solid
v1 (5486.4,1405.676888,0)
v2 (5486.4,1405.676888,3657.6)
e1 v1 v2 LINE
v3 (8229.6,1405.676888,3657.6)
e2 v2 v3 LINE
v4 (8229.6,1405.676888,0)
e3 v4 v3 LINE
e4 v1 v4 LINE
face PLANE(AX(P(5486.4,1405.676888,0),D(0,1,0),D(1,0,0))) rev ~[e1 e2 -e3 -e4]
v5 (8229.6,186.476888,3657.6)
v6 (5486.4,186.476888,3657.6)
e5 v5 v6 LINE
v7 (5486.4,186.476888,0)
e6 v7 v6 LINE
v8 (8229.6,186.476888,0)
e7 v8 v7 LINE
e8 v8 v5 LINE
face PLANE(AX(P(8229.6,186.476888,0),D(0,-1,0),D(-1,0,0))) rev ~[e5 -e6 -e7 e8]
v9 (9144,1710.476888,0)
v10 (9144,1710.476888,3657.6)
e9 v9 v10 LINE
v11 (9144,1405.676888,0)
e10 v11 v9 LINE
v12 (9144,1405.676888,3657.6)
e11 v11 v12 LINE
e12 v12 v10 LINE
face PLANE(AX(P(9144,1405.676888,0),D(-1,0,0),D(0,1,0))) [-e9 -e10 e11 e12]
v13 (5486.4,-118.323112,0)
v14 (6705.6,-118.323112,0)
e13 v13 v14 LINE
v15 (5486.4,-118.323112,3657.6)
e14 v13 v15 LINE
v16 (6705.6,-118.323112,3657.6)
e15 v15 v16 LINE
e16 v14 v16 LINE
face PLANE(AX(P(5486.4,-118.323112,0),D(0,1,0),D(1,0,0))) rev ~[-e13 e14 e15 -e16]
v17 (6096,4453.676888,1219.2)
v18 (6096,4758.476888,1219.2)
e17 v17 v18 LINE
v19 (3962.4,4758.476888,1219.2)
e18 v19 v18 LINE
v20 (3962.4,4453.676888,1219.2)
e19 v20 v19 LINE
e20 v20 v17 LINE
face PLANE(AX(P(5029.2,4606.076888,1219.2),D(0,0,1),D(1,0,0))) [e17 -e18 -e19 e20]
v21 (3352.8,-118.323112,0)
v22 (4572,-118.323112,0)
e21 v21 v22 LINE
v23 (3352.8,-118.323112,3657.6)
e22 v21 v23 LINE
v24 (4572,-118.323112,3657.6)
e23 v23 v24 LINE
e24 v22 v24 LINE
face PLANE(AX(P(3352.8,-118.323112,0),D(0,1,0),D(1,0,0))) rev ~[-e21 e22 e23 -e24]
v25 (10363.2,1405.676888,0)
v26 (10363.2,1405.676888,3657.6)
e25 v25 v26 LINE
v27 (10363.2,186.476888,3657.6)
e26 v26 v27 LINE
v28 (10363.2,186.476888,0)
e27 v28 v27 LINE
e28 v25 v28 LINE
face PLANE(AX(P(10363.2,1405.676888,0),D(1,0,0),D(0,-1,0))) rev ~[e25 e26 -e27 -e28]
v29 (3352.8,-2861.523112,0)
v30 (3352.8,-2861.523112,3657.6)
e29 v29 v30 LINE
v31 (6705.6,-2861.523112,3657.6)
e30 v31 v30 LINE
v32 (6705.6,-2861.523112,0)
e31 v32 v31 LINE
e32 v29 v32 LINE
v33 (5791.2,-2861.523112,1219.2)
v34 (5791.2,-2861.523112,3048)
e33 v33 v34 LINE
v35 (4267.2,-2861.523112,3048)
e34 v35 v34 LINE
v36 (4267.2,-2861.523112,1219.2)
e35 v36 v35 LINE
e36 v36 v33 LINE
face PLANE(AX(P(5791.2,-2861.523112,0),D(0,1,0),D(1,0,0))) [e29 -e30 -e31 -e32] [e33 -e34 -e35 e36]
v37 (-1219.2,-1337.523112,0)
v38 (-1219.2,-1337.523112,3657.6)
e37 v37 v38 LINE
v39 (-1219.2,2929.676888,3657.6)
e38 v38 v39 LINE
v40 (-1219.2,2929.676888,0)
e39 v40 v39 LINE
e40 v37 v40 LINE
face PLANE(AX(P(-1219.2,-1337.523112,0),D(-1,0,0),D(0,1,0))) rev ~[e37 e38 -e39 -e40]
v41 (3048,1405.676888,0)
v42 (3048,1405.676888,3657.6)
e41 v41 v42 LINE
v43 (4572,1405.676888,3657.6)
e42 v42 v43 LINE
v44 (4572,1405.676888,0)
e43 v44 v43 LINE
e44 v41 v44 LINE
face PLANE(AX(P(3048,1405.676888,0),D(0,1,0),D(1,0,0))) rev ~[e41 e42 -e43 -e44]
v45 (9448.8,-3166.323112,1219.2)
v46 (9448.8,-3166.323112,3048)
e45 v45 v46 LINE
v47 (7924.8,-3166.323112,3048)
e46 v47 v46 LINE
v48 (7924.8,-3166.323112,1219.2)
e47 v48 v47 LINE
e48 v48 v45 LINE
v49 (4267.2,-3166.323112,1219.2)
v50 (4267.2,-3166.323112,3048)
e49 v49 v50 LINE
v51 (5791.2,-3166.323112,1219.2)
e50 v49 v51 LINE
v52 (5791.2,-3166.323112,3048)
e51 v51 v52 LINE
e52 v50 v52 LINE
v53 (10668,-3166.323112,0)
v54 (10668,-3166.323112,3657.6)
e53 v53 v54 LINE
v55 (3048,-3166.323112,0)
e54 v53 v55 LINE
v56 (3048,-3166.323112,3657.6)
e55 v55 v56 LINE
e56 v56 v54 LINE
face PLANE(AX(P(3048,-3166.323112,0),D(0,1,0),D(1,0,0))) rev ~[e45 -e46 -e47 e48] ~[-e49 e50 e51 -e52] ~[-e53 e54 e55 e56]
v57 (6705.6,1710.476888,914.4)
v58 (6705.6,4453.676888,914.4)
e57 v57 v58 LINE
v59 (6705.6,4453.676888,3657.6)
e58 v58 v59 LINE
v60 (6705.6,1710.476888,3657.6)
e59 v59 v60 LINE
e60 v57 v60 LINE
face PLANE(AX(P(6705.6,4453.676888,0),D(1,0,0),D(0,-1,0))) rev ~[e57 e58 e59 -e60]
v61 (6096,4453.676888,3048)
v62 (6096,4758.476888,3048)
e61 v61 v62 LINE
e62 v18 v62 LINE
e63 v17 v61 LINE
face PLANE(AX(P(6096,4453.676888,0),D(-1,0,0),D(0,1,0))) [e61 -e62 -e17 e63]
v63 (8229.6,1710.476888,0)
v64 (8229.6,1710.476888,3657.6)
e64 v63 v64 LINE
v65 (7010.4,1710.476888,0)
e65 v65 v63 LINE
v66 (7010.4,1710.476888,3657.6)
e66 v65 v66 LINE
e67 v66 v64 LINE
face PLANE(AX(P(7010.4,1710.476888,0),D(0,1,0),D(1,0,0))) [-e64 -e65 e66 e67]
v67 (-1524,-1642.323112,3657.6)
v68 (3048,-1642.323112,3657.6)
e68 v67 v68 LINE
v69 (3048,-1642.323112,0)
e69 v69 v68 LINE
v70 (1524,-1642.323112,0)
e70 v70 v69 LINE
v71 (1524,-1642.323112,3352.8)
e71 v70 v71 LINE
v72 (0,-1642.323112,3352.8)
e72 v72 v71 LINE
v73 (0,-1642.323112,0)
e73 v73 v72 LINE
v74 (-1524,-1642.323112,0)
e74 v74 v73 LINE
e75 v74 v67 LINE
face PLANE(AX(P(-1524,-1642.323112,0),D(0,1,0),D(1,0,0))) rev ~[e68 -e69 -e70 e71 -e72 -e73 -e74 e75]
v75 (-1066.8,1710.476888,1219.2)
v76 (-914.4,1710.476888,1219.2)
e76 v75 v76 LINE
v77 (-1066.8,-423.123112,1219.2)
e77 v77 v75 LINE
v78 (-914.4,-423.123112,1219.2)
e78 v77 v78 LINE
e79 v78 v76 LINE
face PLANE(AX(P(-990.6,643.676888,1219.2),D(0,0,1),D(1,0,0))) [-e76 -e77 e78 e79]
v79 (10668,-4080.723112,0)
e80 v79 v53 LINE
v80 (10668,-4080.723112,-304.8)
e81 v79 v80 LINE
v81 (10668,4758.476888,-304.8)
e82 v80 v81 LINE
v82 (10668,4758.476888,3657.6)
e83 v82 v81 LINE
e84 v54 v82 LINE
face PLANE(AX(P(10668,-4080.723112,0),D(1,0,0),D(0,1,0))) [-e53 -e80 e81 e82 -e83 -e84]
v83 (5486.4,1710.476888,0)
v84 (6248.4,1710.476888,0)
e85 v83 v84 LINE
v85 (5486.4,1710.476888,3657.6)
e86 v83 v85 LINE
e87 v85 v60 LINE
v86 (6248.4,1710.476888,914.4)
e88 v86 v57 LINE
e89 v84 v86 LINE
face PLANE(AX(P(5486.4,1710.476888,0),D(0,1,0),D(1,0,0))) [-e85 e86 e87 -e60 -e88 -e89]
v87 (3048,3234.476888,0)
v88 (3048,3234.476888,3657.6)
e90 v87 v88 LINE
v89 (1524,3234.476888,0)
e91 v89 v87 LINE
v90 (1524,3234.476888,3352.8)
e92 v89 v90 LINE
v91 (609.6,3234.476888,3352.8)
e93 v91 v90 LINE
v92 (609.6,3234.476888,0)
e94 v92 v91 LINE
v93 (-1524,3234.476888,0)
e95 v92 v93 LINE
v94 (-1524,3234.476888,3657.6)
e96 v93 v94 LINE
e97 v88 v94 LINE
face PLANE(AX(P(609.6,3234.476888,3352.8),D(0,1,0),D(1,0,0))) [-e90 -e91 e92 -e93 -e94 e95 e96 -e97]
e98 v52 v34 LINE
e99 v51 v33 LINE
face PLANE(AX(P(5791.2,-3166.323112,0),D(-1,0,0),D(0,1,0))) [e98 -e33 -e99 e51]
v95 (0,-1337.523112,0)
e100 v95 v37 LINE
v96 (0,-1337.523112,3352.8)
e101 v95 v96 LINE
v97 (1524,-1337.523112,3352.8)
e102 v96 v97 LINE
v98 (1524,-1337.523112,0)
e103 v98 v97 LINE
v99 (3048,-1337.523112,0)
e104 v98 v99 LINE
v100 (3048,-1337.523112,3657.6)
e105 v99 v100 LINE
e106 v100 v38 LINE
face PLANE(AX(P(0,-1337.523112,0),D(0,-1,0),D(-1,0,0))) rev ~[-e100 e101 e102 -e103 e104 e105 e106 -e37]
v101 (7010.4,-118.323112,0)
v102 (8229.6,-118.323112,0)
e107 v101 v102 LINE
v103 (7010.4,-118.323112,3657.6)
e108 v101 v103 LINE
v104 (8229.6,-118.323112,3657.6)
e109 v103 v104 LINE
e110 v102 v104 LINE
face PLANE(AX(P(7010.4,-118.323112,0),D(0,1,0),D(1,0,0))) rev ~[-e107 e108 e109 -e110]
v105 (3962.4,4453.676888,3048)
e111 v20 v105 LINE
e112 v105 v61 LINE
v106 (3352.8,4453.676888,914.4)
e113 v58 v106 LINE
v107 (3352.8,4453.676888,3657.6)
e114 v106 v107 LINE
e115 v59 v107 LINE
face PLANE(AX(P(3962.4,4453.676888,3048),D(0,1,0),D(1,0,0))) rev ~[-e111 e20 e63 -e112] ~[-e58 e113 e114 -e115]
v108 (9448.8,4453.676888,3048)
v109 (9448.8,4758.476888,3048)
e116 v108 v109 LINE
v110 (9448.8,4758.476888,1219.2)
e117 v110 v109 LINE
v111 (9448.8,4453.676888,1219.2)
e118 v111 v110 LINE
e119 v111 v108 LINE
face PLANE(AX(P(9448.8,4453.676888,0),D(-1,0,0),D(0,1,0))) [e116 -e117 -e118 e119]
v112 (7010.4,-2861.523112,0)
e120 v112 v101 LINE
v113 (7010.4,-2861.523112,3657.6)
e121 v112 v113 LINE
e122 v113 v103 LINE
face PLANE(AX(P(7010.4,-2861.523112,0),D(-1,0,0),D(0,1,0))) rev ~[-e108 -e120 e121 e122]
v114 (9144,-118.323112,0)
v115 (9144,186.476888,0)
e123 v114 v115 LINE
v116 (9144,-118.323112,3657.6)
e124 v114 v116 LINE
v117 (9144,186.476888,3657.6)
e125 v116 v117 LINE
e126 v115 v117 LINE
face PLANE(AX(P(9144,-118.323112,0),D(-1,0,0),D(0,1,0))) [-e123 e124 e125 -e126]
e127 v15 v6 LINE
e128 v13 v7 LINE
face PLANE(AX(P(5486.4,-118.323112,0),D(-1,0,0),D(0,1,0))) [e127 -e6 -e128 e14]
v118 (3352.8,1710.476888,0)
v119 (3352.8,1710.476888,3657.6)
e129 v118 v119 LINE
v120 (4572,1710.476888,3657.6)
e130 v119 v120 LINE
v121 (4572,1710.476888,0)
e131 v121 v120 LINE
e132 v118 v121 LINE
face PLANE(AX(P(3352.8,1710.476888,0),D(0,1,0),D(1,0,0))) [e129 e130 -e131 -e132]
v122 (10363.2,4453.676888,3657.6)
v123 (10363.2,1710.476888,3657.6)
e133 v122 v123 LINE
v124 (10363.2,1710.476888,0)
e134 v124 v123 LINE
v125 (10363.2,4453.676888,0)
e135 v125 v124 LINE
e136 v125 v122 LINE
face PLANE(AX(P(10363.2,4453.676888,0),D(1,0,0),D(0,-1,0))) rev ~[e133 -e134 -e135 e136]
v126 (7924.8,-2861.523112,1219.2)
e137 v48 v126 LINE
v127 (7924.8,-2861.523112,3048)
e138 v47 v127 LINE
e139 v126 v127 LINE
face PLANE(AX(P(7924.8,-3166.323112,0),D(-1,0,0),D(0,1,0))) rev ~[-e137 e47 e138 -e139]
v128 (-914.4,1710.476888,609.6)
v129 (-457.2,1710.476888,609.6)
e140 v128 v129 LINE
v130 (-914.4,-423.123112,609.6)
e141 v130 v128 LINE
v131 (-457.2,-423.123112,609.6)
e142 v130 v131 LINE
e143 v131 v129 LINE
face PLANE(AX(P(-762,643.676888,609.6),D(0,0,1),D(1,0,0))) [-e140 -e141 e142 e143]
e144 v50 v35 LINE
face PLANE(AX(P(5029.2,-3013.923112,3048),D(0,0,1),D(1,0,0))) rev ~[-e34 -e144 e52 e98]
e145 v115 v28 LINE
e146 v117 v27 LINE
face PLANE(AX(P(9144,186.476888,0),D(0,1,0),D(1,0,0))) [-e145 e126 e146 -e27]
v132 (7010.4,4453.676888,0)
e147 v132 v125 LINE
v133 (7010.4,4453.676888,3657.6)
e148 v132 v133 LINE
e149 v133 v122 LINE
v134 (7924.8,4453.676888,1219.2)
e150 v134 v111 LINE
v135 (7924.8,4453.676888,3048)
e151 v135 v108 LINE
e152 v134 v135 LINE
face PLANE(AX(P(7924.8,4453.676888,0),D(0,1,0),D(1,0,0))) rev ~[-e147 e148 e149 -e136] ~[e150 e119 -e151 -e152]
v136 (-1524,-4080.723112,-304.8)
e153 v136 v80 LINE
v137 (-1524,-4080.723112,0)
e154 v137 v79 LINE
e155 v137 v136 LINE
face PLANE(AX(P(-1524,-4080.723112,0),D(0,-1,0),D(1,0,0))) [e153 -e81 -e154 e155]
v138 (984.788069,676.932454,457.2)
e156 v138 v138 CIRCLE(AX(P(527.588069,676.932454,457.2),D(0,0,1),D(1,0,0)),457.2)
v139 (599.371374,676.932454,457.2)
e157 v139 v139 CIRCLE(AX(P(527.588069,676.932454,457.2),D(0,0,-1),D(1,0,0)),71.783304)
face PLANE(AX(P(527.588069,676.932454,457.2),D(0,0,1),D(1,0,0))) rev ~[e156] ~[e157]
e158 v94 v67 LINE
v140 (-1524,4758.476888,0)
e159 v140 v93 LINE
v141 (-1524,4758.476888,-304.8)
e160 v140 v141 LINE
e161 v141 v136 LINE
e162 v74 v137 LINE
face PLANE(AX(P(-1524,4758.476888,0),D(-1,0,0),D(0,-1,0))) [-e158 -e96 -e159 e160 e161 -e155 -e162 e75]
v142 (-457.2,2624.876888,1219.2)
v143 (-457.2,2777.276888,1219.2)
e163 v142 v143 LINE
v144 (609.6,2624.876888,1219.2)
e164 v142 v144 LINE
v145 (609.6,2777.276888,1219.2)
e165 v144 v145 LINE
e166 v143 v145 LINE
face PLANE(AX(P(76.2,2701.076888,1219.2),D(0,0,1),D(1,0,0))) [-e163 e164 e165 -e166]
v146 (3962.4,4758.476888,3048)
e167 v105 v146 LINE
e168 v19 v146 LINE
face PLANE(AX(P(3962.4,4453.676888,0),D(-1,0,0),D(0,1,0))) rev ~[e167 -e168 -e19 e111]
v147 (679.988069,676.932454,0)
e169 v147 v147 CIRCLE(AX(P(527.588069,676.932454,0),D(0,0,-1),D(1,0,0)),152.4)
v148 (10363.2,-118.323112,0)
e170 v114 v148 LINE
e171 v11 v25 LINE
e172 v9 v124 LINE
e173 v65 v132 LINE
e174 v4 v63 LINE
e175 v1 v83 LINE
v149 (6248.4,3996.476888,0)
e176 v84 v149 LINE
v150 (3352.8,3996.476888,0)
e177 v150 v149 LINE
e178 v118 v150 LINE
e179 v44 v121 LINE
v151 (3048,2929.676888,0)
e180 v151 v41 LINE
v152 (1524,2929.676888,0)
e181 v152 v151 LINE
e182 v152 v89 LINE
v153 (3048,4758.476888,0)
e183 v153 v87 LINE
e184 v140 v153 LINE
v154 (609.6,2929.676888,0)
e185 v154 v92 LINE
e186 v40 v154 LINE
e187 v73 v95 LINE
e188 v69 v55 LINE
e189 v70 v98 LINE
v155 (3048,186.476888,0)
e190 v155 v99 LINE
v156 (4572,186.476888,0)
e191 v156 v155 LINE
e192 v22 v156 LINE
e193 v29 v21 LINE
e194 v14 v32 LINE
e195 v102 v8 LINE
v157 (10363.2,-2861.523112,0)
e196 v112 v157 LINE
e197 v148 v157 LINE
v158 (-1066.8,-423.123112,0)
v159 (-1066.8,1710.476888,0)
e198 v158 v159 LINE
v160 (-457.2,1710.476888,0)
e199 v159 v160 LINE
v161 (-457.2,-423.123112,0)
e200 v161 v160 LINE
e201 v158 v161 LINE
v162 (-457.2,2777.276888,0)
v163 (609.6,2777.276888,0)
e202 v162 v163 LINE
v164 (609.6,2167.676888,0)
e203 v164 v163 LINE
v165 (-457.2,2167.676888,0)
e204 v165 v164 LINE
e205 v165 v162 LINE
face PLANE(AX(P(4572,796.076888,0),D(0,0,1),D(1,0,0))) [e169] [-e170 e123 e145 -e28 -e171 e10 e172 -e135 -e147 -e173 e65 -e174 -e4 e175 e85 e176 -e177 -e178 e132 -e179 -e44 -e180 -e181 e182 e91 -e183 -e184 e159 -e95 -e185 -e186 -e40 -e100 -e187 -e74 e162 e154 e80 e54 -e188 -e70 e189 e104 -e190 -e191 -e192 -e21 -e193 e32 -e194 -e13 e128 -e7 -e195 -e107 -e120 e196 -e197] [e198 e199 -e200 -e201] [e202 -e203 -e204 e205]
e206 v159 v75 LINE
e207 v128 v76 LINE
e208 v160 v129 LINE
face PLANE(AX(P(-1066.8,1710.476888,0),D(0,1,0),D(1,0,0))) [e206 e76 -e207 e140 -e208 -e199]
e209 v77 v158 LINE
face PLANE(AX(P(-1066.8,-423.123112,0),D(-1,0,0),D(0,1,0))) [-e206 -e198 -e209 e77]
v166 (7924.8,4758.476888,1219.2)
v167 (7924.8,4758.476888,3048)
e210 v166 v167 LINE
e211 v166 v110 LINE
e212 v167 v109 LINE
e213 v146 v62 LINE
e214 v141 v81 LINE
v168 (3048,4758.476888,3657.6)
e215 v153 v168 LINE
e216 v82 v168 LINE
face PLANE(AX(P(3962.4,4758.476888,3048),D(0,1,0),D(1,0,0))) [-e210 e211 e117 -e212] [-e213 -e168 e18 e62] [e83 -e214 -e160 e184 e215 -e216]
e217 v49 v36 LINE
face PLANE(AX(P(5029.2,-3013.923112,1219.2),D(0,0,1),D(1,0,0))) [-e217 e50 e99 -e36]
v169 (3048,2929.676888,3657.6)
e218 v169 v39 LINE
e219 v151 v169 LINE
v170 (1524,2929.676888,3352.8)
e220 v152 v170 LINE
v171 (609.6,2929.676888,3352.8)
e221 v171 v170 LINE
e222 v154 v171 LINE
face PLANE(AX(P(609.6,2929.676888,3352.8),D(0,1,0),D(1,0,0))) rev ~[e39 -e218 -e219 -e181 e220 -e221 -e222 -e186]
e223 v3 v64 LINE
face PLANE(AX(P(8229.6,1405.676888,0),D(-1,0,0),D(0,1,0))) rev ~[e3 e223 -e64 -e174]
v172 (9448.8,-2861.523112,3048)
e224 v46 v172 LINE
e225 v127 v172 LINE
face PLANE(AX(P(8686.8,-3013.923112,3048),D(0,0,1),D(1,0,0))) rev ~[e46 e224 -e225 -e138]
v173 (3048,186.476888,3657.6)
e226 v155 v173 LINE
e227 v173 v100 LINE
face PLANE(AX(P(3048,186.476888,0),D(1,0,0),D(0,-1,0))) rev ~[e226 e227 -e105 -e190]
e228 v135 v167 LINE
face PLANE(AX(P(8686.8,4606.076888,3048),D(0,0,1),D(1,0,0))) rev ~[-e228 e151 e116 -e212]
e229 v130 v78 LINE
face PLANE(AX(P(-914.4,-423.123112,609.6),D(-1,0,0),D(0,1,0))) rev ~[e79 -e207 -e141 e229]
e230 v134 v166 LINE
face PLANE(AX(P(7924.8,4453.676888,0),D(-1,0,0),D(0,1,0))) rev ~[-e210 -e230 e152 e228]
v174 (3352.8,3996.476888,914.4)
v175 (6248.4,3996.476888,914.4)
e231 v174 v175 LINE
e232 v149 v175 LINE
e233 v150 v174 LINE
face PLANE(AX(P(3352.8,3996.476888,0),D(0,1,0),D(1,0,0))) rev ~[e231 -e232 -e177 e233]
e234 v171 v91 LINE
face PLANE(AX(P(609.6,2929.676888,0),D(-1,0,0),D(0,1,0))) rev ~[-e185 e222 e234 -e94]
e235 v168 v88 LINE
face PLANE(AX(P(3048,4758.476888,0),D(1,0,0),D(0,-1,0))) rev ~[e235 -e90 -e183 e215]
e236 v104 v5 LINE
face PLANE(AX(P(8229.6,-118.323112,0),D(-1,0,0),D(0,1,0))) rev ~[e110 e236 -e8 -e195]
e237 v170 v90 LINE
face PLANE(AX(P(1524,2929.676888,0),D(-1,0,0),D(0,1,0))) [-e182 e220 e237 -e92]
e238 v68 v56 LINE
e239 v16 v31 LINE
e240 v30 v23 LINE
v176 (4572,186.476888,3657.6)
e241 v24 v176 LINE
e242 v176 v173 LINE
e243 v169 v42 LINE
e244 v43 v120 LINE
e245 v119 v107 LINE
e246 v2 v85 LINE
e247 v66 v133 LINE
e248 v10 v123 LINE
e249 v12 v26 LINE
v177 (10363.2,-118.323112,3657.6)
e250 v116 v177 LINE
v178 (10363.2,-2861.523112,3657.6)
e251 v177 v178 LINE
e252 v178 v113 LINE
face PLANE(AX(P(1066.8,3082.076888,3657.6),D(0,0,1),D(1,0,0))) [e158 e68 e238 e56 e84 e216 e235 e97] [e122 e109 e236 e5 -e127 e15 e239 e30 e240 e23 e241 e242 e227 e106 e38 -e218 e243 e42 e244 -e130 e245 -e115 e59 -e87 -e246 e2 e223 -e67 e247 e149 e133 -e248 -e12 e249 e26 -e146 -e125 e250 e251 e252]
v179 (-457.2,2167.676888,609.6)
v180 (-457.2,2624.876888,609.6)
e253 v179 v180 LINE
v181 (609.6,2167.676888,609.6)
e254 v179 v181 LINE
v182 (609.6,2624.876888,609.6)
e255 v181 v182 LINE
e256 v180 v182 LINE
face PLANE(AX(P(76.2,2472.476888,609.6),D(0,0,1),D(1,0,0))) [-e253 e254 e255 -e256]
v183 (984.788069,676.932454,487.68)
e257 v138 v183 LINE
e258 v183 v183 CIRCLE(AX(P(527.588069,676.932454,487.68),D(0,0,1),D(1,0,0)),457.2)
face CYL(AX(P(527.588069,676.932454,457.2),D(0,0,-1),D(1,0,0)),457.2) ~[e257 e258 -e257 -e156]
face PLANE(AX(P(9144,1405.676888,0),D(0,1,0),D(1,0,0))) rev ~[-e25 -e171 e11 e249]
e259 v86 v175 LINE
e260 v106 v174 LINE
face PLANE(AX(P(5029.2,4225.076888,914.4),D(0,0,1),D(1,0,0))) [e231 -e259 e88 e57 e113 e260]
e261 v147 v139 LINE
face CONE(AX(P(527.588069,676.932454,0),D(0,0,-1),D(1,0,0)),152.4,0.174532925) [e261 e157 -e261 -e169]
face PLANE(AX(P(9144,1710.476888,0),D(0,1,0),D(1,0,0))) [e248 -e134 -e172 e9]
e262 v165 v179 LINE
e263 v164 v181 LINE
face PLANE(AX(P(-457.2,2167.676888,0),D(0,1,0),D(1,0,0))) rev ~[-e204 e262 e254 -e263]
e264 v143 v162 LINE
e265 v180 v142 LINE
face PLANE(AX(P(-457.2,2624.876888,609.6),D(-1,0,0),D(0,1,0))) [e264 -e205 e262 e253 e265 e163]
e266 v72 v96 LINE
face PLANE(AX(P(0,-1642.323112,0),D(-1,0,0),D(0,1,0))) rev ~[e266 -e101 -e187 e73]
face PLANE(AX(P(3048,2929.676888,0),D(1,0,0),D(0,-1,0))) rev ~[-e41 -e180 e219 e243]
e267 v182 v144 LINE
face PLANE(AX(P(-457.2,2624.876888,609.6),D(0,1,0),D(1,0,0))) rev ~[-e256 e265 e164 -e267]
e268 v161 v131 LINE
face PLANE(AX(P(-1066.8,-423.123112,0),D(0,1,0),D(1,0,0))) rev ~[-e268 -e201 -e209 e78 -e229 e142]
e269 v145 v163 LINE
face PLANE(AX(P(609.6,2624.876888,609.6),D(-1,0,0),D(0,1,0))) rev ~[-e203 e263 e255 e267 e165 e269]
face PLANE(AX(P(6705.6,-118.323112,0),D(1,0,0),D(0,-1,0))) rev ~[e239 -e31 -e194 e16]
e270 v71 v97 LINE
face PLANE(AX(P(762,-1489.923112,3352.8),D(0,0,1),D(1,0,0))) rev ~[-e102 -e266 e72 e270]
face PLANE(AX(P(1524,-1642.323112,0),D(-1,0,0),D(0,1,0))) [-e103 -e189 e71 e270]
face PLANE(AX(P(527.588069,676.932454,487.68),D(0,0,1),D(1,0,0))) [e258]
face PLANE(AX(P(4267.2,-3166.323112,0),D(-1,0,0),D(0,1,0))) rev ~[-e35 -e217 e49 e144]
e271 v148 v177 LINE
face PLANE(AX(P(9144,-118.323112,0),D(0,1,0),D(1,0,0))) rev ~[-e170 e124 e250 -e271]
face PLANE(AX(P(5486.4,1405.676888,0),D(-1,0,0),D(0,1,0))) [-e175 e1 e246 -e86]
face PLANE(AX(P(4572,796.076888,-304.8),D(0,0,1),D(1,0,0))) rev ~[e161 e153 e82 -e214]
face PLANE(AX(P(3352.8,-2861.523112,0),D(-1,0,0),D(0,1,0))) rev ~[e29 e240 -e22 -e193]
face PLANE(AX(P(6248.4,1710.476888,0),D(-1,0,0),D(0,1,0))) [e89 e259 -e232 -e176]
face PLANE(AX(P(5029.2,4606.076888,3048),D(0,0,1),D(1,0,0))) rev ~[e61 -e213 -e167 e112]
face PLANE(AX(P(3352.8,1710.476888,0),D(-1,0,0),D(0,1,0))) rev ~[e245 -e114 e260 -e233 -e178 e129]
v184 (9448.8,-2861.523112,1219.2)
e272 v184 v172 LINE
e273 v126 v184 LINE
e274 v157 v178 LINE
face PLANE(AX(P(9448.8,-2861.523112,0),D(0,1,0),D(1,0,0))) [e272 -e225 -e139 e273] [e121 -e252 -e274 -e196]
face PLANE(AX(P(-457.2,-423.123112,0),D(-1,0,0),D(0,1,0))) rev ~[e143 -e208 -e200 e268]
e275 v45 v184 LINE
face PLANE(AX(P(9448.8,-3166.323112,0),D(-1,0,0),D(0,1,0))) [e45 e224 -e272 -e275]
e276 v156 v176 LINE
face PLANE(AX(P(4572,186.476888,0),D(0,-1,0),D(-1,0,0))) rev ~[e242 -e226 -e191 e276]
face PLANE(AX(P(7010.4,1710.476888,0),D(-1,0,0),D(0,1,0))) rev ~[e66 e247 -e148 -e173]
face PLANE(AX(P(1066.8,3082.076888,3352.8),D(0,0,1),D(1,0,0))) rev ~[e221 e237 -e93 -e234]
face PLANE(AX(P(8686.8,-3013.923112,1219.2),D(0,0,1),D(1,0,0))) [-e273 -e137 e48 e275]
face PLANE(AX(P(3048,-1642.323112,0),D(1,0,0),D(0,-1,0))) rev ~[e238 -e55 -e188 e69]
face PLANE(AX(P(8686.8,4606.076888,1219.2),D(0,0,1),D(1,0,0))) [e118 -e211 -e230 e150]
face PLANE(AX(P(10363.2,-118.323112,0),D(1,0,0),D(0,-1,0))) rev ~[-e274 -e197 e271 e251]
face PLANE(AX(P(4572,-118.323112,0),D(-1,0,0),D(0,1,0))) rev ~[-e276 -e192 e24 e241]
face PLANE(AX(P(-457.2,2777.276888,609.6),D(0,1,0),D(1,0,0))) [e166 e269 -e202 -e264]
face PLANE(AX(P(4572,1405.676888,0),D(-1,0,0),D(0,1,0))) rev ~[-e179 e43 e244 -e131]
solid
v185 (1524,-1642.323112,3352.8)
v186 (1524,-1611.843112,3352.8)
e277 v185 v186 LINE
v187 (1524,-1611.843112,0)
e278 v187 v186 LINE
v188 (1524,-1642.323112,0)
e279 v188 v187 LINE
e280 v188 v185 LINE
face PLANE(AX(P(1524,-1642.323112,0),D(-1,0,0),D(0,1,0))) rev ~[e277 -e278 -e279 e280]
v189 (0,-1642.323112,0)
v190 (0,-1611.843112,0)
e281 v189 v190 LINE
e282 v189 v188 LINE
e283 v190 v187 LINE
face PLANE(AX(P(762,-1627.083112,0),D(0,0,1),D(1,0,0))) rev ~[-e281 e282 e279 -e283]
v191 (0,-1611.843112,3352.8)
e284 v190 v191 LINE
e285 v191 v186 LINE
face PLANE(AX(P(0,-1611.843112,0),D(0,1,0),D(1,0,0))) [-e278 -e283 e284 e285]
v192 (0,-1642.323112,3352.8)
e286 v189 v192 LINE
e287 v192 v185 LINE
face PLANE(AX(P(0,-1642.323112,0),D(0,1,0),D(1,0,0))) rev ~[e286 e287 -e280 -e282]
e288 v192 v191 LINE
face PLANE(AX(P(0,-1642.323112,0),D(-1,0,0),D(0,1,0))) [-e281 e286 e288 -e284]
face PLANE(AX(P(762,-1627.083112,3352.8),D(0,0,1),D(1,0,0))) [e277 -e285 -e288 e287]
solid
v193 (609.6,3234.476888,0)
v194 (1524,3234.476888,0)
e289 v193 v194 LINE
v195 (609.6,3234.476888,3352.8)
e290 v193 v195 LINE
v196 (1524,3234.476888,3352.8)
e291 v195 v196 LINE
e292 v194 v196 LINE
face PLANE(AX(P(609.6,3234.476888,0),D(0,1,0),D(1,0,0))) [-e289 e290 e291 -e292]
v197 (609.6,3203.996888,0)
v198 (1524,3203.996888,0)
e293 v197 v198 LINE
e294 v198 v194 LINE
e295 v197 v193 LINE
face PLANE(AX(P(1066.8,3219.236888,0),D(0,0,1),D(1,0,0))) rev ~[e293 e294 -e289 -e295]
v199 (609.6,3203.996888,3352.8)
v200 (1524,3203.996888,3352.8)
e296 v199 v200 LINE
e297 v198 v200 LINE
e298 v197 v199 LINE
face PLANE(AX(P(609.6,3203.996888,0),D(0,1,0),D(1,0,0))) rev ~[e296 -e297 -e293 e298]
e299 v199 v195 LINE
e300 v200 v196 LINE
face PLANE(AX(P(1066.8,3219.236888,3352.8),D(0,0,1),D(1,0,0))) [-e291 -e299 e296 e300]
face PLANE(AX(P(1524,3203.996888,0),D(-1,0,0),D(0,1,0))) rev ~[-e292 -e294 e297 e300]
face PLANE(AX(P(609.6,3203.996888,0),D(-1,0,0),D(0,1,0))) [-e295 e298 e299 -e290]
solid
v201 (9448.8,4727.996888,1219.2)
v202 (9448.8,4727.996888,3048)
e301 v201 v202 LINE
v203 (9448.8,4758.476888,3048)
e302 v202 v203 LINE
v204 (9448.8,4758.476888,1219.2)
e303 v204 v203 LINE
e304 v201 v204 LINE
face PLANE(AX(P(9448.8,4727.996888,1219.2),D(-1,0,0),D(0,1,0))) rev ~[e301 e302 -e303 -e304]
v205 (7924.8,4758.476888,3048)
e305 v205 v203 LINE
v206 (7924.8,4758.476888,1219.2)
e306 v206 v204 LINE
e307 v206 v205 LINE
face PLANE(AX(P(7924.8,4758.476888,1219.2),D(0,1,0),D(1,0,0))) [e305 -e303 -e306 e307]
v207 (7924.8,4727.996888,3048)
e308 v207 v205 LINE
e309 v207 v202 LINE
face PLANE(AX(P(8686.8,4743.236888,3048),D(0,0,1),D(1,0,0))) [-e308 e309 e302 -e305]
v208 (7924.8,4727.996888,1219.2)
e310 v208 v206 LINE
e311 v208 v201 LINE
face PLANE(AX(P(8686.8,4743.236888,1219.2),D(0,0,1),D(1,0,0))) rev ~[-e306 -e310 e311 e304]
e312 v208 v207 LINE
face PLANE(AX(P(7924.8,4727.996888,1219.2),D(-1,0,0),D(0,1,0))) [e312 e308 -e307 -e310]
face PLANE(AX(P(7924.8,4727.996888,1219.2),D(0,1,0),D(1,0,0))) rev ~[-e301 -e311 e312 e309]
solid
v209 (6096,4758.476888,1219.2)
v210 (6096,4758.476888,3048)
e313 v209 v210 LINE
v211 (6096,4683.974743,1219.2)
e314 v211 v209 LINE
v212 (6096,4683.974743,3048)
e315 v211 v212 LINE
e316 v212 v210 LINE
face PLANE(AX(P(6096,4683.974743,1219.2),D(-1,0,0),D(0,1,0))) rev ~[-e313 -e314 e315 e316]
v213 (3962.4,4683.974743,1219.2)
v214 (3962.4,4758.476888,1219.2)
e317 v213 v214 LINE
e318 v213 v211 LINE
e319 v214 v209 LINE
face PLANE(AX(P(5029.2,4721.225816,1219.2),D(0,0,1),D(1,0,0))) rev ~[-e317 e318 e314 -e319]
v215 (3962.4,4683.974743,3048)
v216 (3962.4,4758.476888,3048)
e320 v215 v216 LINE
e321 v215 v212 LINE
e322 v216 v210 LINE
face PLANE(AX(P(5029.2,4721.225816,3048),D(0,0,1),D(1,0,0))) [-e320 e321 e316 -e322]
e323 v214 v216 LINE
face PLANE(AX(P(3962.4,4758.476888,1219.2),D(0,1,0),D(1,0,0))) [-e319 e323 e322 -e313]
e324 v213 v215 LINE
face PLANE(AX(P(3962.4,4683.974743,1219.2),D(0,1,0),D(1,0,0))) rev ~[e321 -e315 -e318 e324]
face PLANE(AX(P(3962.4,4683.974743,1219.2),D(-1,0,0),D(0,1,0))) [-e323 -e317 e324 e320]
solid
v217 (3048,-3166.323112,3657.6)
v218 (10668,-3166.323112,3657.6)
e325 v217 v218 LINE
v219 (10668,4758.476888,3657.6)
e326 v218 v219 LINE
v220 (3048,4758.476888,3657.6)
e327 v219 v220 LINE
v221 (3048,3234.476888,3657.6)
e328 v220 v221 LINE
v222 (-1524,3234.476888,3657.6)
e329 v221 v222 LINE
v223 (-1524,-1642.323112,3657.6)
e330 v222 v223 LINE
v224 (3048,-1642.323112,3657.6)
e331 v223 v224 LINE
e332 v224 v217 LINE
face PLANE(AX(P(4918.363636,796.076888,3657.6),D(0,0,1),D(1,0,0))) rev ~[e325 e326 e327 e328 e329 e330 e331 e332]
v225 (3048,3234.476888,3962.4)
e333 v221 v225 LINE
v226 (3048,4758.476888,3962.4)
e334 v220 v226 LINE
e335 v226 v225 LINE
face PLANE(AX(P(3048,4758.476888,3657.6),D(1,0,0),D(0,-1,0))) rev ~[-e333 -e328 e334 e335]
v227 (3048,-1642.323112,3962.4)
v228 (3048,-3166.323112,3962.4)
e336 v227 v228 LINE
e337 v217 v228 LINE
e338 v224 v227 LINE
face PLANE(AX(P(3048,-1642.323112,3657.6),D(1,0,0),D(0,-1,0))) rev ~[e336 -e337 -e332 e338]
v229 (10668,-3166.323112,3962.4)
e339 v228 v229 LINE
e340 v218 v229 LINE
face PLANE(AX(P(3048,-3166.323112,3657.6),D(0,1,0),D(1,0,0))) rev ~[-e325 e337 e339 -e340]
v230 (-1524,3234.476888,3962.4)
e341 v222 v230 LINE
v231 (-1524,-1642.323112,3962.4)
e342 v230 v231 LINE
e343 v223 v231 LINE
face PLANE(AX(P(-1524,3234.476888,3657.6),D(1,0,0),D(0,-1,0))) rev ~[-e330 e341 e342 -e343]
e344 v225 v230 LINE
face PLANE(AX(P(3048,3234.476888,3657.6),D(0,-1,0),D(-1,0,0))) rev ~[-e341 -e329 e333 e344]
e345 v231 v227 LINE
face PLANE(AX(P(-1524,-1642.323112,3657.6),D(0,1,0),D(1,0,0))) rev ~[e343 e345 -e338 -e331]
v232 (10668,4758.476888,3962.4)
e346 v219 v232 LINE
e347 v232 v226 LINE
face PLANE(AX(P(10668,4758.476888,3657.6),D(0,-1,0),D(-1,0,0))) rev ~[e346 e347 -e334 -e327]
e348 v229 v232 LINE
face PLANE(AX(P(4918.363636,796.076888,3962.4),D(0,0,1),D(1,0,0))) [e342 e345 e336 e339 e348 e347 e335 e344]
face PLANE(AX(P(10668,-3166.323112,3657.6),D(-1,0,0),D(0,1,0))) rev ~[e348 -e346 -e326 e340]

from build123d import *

# Parameters (mm, degrees)
F0_W      = 1828.8
F0_H      = 304.8
F1_DEPTH  = 3657.6
F0_W_2    = 1524
F0_W_3    = 1219.2
F0_W_4    = 914.4
F0_W_5    = 609.6
F2_W      = 12192
F2_H      = 7924.8
F2_H_2    = 914.4
F3_DEPTH  = 304.8
F4_W      = 2133.6
F4_H      = 304.8
F4_W_2    = 1524
F5_DEPTH  = 1219.2
F7_W      = 2133.6
F7_H      = 304.8
F7_W_2    = 1524
F8_DEPTH  = 609.6
F11_DEPTH = 304.8
F13_W     = 1524
F13_H     = 30.48
F14_DEPTH = 3352.8
F13_W_2   = 914.4
F15_W     = 1524
F15_H     = 304.8
F16_DEPTH = 1219.2
F17_W     = 457.2
F17_H     = 2286
F18_DEPTH = 914.4
F19_W     = 1066.8
F19_H     = 609.6
F19_W_2   = 609.6
F19_H_2   = 2133.6
F20_DEPTH = 609.6
F21_W     = 1066.8
F21_H     = 152.4
F21_W_2   = 152.4
F21_H_2   = 2133.6
F22_DEPTH = 609.6
F23_R     = 152.4
F24_DEPTH = 457.2
F24_TAPER = 10
F25_R     = 457.2
F26_DEPTH = 30.48
F27_W     = 914.4
F27_H     = 304.8
F27_W_2   = 1524
F28_DEPTH = 304.8
F29_W     = 1524
F29_H     = 30.48
F30_DEPTH = 1828.8
F31_W     = 2133.6
F31_H     = 74.5021455099
F32_DEPTH = 1828.8


with BuildPart() as f1:
    # F0 (on Top) → F1 (new body)
    with BuildSketch(Plane.XY):
        Polygon((-1524, -1337.5231116007), (-1524, -1642.3231116007), (0, -1642.3231116007), (0, -1337.5231116007), (-1219.2, -1337.5231116007), align=None)
        Polygon((-1524, 3234.4768883993), (-1524, -1337.5231116007), (-1219.2, -1337.5231116007), (-1219.2, 2929.6768883993), (-1219.2, 3234.4768883993), align=None)
        with Locations((-304.8, 3082.0768883993)):
            Rectangle(F0_W, F0_H)
    extrude(amount=F1_DEPTH)



with BuildPart() as f1b:
    # F0 (on Top) → F1, piece 2 (new body)
    with BuildSketch(Plane.XY):
        with Locations((2286, -1489.9231116007)):
            Rectangle(F0_W_2, F0_H)
        Polygon((3048, 186.4768883993), (3048, -1337.5231116007), (3048, -1642.3231116007), (3048, -3166.3231116007), (3352.8, -3166.3231116007), (3352.8, -2861.5231116007), (3352.8, -118.3231116007), (3352.8, 186.4768883993), align=None)
        with Locations((3962.4, 34.0768883993)):
            Rectangle(F0_W_3, F0_H)
        with Locations((3810, -3013.9231116007)):
            Rectangle(F0_W_4, F0_H)
    extrude(amount=F1_DEPTH)


with BuildPart() as f1c:
    # F0 (on Top) → F1, piece 3 (new body)
    with BuildSketch(Plane.XY):
        with Locations((2286, 3082.0768883993)):
            Rectangle(F0_W_2, F0_H)
        Polygon((3048, 4758.4768883993), (3048, 3234.4768883993), (3048, 2929.6768883993), (3048, 1405.6768883993), (3352.8, 1405.6768883993), (3352.8, 1710.4768883993), (3352.8, 4453.6768883993), (3352.8, 4758.4768883993), align=None)
        with Locations((3657.6, 4606.0768883993)):
            Rectangle(F0_W_5, F0_H)
        with Locations((3962.4, 1558.0768883993)):
            Rectangle(F0_W_3, F0_H)
    extrude(amount=F1_DEPTH)


with BuildPart() as f1d:
    # F0 (on Top) → F1, piece 4 (new body)
    with BuildSketch(Plane.XY):
        with Locations((6096, 1558.0768883993)):
            Rectangle(F0_W_3, F0_H)
        Polygon((6705.6, 4453.6768883993), (6705.6, 1710.4768883993), (6705.6, 1405.6768883993), (7010.4, 1405.6768883993), (7010.4, 1710.4768883993), (7010.4, 4453.6768883993), (7010.4, 4758.4768883993), (6705.6, 4758.4768883993), align=None)
        with Locations((6400.8, 4606.0768883993)):
            Rectangle(F0_W_5, F0_H)
        with Locations((7620, 1558.0768883993)):
            Rectangle(F0_W_3, F0_H)
        with Locations((7467.6, 4606.0768883993)):
            Rectangle(F0_W_4, F0_H)
    extrude(amount=F1_DEPTH)


with BuildPart() as f1e:
    # F0 (on Top) → F1, piece 5 (new body)
    with BuildSketch(Plane.XY):
        with Locations((6096, 34.0768883993)):
            Rectangle(F0_W_3, F0_H)
        Polygon((7010.4, 186.4768883993), (6705.6, 186.4768883993), (6705.6, -118.3231116007), (6705.6, -2861.5231116007), (6705.6, -3166.3231116007), (7010.4, -3166.3231116007), (7010.4, -2861.5231116007), (7010.4, -118.3231116007), align=None)
        with Locations((7620, 34.0768883993)):
            Rectangle(F0_W_3, F0_H)
        with Locations((6248.4, -3013.9231116007)):
            Rectangle(F0_W_4, F0_H)
        with Locations((7467.6, -3013.9231116007)):
            Rectangle(F0_W_4, F0_H)
    extrude(amount=F1_DEPTH)


with BuildPart() as f1f:
    # F0 (on Top) → F1, piece 6 (new body)
    with BuildSketch(Plane.XY):
        with Locations((9906, 4606.0768883993)):
            Rectangle(F0_W_4, F0_H)
        Polygon((10668, 4758.4768883993), (10363.2, 4758.4768883993), (10363.2, 4453.6768883993), (10363.2, 1710.4768883993), (10363.2, 1405.6768883993), (10668, 1405.6768883993), align=None)
        with Locations((9753.6, 1558.0768883993)):
            Rectangle(F0_W_3, F0_H)
        Polygon((10668, -3166.3231116007), (10668, 1405.6768883993), (10363.2, 1405.6768883993), (10363.2, 186.4768883993), (10363.2, -118.3231116007), (10363.2, -2861.5231116007), (10363.2, -3166.3231116007), align=None)
        with Locations((9753.6, 34.0768883993)):
            Rectangle(F0_W_3, F0_H)
        with Locations((9906, -3013.9231116007)):
            Rectangle(F0_W_4, F0_H)
    extrude(amount=F1_DEPTH)


with BuildPart() as f1_1:
    add(f1.part)

    add(f1b.part)  # F3 merges F1b

    add(f1c.part)  # F3 merges F1c

    add(f1d.part)  # F3 merges F1d

    add(f1e.part)  # F3 merges F1e

    add(f1f.part)  # F3 merges F1f
    # F2 (on Top) → F3 (join)
    with BuildSketch(Plane.XY):
        with Locations((4572, 796.0768883993)):
            Rectangle(F2_W, F2_H)
        with Locations((4572, -3623.5231116007)):
            Rectangle(F2_W, F2_H_2)
    extrude(amount=-F3_DEPTH)

    # F4 (on Top) → F5 (join)
    with BuildSketch(Plane.XY):
        with Locations((5029.2, 4606.0768883993)):
            Rectangle(F4_W, F4_H)
        with Locations((8686.8, -3013.9231116007)):
            Rectangle(F4_W_2, F4_H)
        with Locations((5029.2, -3013.9231116007)):
            Rectangle(F4_W_2, F4_H)
    extrude(amount=F5_DEPTH)

    # F7 (on offset) → F8 (join)
    with BuildSketch(Plane.XY.offset(3048)):
        with Locations((5029.2, 4606.0768883993)):
            Rectangle(F7_W, F7_H)
        with Locations((8686.8, 4606.0768883993)):
            Rectangle(F7_W_2, F7_H)
        with Locations((8686.8, -3013.9231116007)):
            Rectangle(F7_W_2, F7_H)
        with Locations((5029.2, -3013.9231116007)):
            Rectangle(F7_W_2, F7_H)
    extrude(amount=F8_DEPTH)

    # F12: union 

    # F15 (on Top) → F16 (join)
    with BuildSketch(Plane.XY):
        with Locations((8686.8, 4606.0768883993)):
            Rectangle(F15_W, F15_H)
    extrude(amount=F16_DEPTH)

    # F17 (on Top) → F18 (join)
    with BuildSketch(Plane.XY):
        Polygon((6705.6, 4453.6768883993), (3352.8, 4453.6768883993), (3352.8, 3996.4768883993), (6248.4, 3996.4768883993), (6705.6, 3996.4768883993), align=None)
        with Locations((6477, 2853.4768883993)):
            Rectangle(F17_W, F17_H)
    extrude(amount=F18_DEPTH)

    # F19 (on Top) → F20 (join)
    with BuildSketch(Plane.XY):
        with Locations((76.2, 2472.4768883993)):
            Rectangle(F19_W, F19_H)
        with Locations((-762, 643.6768883993)):
            Rectangle(F19_W_2, F19_H_2)
    extrude(amount=F20_DEPTH)

    # F21 (on face) → F22 (join)
    with BuildSketch(Plane.XY.offset(609.6)):
        with Locations((76.2, 2701.0768883993)):
            Rectangle(F21_W, F21_H)
        with Locations((-990.6, 643.6768883993)):
            Rectangle(F21_W_2, F21_H_2)
    extrude(amount=F22_DEPTH)

    # F23 (on Top) → F24 (join)
    with BuildSketch(Plane.XY):
        with Locations((527.5880694389, 676.9324541092)):
            Circle(F23_R)
    extrude(amount=F24_DEPTH, taper=F24_TAPER)

    # F25 (on face) → F26 (join)
    with BuildSketch(Plane.XY.offset(457.2)):
        with Locations((527.5880694389, 676.9324541092)):
            Circle(F25_R)
    extrude(amount=F26_DEPTH)

    # F27 (on face) → F28 (join)
    with BuildSketch(Plane.XY.offset(3352.8)):
        with Locations((1066.8, 3082.0768883993)):
            Rectangle(F27_W, F27_H)
        with Locations((762, -1489.9231116007)):
            Rectangle(F27_W_2, F27_H)
    extrude(amount=F28_DEPTH)


with BuildPart() as f11:
    # F10 (on offset) → F11 (new body)
    with BuildSketch(Plane.XY.offset(3657.6)):
        Polygon((3048, 3234.4768883993), (-1524, 3234.4768883993), (-1524, -1642.3231116007), (3048, -1642.3231116007), (3048, -3166.3231116007), (10668, -3166.3231116007), (10668, 4758.4768883993), (3048, 4758.4768883993), align=None)
    extrude(amount=F11_DEPTH)


with BuildPart() as f14:
    # F13 (on Top) → F14 (new body)
    with BuildSketch(Plane.XY):
        with Locations((762, -1627.0831116007)):
            Rectangle(F13_W, F13_H)
    extrude(amount=F14_DEPTH)


with BuildPart() as f14b:
    # F13 (on Top) → F14, piece 2 (new body)
    with BuildSketch(Plane.XY):
        with Locations((1066.8, 3219.2368883993)):
            Rectangle(F13_W_2, F13_H)
    extrude(amount=F14_DEPTH)


with BuildPart() as f30:
    # F29 (on face) → F30 (new body)
    with BuildSketch(Plane.XY.offset(1219.2)):
        with Locations((8686.8, 4743.2368883993)):
            Rectangle(F29_W, F29_H)
    extrude(amount=F30_DEPTH)


with BuildPart() as f32:
    # F31 (on face) → F32 (new body)
    with BuildSketch(Plane.XY.offset(1219.2)):
        with Locations((5029.2, 4721.2258156443)):
            Rectangle(F31_W, F31_H)
    extrude(amount=F32_DEPTH)


solid = Compound([f1_1.part, f11.part, f14.part, f14b.part, f30.part, f32.part])
